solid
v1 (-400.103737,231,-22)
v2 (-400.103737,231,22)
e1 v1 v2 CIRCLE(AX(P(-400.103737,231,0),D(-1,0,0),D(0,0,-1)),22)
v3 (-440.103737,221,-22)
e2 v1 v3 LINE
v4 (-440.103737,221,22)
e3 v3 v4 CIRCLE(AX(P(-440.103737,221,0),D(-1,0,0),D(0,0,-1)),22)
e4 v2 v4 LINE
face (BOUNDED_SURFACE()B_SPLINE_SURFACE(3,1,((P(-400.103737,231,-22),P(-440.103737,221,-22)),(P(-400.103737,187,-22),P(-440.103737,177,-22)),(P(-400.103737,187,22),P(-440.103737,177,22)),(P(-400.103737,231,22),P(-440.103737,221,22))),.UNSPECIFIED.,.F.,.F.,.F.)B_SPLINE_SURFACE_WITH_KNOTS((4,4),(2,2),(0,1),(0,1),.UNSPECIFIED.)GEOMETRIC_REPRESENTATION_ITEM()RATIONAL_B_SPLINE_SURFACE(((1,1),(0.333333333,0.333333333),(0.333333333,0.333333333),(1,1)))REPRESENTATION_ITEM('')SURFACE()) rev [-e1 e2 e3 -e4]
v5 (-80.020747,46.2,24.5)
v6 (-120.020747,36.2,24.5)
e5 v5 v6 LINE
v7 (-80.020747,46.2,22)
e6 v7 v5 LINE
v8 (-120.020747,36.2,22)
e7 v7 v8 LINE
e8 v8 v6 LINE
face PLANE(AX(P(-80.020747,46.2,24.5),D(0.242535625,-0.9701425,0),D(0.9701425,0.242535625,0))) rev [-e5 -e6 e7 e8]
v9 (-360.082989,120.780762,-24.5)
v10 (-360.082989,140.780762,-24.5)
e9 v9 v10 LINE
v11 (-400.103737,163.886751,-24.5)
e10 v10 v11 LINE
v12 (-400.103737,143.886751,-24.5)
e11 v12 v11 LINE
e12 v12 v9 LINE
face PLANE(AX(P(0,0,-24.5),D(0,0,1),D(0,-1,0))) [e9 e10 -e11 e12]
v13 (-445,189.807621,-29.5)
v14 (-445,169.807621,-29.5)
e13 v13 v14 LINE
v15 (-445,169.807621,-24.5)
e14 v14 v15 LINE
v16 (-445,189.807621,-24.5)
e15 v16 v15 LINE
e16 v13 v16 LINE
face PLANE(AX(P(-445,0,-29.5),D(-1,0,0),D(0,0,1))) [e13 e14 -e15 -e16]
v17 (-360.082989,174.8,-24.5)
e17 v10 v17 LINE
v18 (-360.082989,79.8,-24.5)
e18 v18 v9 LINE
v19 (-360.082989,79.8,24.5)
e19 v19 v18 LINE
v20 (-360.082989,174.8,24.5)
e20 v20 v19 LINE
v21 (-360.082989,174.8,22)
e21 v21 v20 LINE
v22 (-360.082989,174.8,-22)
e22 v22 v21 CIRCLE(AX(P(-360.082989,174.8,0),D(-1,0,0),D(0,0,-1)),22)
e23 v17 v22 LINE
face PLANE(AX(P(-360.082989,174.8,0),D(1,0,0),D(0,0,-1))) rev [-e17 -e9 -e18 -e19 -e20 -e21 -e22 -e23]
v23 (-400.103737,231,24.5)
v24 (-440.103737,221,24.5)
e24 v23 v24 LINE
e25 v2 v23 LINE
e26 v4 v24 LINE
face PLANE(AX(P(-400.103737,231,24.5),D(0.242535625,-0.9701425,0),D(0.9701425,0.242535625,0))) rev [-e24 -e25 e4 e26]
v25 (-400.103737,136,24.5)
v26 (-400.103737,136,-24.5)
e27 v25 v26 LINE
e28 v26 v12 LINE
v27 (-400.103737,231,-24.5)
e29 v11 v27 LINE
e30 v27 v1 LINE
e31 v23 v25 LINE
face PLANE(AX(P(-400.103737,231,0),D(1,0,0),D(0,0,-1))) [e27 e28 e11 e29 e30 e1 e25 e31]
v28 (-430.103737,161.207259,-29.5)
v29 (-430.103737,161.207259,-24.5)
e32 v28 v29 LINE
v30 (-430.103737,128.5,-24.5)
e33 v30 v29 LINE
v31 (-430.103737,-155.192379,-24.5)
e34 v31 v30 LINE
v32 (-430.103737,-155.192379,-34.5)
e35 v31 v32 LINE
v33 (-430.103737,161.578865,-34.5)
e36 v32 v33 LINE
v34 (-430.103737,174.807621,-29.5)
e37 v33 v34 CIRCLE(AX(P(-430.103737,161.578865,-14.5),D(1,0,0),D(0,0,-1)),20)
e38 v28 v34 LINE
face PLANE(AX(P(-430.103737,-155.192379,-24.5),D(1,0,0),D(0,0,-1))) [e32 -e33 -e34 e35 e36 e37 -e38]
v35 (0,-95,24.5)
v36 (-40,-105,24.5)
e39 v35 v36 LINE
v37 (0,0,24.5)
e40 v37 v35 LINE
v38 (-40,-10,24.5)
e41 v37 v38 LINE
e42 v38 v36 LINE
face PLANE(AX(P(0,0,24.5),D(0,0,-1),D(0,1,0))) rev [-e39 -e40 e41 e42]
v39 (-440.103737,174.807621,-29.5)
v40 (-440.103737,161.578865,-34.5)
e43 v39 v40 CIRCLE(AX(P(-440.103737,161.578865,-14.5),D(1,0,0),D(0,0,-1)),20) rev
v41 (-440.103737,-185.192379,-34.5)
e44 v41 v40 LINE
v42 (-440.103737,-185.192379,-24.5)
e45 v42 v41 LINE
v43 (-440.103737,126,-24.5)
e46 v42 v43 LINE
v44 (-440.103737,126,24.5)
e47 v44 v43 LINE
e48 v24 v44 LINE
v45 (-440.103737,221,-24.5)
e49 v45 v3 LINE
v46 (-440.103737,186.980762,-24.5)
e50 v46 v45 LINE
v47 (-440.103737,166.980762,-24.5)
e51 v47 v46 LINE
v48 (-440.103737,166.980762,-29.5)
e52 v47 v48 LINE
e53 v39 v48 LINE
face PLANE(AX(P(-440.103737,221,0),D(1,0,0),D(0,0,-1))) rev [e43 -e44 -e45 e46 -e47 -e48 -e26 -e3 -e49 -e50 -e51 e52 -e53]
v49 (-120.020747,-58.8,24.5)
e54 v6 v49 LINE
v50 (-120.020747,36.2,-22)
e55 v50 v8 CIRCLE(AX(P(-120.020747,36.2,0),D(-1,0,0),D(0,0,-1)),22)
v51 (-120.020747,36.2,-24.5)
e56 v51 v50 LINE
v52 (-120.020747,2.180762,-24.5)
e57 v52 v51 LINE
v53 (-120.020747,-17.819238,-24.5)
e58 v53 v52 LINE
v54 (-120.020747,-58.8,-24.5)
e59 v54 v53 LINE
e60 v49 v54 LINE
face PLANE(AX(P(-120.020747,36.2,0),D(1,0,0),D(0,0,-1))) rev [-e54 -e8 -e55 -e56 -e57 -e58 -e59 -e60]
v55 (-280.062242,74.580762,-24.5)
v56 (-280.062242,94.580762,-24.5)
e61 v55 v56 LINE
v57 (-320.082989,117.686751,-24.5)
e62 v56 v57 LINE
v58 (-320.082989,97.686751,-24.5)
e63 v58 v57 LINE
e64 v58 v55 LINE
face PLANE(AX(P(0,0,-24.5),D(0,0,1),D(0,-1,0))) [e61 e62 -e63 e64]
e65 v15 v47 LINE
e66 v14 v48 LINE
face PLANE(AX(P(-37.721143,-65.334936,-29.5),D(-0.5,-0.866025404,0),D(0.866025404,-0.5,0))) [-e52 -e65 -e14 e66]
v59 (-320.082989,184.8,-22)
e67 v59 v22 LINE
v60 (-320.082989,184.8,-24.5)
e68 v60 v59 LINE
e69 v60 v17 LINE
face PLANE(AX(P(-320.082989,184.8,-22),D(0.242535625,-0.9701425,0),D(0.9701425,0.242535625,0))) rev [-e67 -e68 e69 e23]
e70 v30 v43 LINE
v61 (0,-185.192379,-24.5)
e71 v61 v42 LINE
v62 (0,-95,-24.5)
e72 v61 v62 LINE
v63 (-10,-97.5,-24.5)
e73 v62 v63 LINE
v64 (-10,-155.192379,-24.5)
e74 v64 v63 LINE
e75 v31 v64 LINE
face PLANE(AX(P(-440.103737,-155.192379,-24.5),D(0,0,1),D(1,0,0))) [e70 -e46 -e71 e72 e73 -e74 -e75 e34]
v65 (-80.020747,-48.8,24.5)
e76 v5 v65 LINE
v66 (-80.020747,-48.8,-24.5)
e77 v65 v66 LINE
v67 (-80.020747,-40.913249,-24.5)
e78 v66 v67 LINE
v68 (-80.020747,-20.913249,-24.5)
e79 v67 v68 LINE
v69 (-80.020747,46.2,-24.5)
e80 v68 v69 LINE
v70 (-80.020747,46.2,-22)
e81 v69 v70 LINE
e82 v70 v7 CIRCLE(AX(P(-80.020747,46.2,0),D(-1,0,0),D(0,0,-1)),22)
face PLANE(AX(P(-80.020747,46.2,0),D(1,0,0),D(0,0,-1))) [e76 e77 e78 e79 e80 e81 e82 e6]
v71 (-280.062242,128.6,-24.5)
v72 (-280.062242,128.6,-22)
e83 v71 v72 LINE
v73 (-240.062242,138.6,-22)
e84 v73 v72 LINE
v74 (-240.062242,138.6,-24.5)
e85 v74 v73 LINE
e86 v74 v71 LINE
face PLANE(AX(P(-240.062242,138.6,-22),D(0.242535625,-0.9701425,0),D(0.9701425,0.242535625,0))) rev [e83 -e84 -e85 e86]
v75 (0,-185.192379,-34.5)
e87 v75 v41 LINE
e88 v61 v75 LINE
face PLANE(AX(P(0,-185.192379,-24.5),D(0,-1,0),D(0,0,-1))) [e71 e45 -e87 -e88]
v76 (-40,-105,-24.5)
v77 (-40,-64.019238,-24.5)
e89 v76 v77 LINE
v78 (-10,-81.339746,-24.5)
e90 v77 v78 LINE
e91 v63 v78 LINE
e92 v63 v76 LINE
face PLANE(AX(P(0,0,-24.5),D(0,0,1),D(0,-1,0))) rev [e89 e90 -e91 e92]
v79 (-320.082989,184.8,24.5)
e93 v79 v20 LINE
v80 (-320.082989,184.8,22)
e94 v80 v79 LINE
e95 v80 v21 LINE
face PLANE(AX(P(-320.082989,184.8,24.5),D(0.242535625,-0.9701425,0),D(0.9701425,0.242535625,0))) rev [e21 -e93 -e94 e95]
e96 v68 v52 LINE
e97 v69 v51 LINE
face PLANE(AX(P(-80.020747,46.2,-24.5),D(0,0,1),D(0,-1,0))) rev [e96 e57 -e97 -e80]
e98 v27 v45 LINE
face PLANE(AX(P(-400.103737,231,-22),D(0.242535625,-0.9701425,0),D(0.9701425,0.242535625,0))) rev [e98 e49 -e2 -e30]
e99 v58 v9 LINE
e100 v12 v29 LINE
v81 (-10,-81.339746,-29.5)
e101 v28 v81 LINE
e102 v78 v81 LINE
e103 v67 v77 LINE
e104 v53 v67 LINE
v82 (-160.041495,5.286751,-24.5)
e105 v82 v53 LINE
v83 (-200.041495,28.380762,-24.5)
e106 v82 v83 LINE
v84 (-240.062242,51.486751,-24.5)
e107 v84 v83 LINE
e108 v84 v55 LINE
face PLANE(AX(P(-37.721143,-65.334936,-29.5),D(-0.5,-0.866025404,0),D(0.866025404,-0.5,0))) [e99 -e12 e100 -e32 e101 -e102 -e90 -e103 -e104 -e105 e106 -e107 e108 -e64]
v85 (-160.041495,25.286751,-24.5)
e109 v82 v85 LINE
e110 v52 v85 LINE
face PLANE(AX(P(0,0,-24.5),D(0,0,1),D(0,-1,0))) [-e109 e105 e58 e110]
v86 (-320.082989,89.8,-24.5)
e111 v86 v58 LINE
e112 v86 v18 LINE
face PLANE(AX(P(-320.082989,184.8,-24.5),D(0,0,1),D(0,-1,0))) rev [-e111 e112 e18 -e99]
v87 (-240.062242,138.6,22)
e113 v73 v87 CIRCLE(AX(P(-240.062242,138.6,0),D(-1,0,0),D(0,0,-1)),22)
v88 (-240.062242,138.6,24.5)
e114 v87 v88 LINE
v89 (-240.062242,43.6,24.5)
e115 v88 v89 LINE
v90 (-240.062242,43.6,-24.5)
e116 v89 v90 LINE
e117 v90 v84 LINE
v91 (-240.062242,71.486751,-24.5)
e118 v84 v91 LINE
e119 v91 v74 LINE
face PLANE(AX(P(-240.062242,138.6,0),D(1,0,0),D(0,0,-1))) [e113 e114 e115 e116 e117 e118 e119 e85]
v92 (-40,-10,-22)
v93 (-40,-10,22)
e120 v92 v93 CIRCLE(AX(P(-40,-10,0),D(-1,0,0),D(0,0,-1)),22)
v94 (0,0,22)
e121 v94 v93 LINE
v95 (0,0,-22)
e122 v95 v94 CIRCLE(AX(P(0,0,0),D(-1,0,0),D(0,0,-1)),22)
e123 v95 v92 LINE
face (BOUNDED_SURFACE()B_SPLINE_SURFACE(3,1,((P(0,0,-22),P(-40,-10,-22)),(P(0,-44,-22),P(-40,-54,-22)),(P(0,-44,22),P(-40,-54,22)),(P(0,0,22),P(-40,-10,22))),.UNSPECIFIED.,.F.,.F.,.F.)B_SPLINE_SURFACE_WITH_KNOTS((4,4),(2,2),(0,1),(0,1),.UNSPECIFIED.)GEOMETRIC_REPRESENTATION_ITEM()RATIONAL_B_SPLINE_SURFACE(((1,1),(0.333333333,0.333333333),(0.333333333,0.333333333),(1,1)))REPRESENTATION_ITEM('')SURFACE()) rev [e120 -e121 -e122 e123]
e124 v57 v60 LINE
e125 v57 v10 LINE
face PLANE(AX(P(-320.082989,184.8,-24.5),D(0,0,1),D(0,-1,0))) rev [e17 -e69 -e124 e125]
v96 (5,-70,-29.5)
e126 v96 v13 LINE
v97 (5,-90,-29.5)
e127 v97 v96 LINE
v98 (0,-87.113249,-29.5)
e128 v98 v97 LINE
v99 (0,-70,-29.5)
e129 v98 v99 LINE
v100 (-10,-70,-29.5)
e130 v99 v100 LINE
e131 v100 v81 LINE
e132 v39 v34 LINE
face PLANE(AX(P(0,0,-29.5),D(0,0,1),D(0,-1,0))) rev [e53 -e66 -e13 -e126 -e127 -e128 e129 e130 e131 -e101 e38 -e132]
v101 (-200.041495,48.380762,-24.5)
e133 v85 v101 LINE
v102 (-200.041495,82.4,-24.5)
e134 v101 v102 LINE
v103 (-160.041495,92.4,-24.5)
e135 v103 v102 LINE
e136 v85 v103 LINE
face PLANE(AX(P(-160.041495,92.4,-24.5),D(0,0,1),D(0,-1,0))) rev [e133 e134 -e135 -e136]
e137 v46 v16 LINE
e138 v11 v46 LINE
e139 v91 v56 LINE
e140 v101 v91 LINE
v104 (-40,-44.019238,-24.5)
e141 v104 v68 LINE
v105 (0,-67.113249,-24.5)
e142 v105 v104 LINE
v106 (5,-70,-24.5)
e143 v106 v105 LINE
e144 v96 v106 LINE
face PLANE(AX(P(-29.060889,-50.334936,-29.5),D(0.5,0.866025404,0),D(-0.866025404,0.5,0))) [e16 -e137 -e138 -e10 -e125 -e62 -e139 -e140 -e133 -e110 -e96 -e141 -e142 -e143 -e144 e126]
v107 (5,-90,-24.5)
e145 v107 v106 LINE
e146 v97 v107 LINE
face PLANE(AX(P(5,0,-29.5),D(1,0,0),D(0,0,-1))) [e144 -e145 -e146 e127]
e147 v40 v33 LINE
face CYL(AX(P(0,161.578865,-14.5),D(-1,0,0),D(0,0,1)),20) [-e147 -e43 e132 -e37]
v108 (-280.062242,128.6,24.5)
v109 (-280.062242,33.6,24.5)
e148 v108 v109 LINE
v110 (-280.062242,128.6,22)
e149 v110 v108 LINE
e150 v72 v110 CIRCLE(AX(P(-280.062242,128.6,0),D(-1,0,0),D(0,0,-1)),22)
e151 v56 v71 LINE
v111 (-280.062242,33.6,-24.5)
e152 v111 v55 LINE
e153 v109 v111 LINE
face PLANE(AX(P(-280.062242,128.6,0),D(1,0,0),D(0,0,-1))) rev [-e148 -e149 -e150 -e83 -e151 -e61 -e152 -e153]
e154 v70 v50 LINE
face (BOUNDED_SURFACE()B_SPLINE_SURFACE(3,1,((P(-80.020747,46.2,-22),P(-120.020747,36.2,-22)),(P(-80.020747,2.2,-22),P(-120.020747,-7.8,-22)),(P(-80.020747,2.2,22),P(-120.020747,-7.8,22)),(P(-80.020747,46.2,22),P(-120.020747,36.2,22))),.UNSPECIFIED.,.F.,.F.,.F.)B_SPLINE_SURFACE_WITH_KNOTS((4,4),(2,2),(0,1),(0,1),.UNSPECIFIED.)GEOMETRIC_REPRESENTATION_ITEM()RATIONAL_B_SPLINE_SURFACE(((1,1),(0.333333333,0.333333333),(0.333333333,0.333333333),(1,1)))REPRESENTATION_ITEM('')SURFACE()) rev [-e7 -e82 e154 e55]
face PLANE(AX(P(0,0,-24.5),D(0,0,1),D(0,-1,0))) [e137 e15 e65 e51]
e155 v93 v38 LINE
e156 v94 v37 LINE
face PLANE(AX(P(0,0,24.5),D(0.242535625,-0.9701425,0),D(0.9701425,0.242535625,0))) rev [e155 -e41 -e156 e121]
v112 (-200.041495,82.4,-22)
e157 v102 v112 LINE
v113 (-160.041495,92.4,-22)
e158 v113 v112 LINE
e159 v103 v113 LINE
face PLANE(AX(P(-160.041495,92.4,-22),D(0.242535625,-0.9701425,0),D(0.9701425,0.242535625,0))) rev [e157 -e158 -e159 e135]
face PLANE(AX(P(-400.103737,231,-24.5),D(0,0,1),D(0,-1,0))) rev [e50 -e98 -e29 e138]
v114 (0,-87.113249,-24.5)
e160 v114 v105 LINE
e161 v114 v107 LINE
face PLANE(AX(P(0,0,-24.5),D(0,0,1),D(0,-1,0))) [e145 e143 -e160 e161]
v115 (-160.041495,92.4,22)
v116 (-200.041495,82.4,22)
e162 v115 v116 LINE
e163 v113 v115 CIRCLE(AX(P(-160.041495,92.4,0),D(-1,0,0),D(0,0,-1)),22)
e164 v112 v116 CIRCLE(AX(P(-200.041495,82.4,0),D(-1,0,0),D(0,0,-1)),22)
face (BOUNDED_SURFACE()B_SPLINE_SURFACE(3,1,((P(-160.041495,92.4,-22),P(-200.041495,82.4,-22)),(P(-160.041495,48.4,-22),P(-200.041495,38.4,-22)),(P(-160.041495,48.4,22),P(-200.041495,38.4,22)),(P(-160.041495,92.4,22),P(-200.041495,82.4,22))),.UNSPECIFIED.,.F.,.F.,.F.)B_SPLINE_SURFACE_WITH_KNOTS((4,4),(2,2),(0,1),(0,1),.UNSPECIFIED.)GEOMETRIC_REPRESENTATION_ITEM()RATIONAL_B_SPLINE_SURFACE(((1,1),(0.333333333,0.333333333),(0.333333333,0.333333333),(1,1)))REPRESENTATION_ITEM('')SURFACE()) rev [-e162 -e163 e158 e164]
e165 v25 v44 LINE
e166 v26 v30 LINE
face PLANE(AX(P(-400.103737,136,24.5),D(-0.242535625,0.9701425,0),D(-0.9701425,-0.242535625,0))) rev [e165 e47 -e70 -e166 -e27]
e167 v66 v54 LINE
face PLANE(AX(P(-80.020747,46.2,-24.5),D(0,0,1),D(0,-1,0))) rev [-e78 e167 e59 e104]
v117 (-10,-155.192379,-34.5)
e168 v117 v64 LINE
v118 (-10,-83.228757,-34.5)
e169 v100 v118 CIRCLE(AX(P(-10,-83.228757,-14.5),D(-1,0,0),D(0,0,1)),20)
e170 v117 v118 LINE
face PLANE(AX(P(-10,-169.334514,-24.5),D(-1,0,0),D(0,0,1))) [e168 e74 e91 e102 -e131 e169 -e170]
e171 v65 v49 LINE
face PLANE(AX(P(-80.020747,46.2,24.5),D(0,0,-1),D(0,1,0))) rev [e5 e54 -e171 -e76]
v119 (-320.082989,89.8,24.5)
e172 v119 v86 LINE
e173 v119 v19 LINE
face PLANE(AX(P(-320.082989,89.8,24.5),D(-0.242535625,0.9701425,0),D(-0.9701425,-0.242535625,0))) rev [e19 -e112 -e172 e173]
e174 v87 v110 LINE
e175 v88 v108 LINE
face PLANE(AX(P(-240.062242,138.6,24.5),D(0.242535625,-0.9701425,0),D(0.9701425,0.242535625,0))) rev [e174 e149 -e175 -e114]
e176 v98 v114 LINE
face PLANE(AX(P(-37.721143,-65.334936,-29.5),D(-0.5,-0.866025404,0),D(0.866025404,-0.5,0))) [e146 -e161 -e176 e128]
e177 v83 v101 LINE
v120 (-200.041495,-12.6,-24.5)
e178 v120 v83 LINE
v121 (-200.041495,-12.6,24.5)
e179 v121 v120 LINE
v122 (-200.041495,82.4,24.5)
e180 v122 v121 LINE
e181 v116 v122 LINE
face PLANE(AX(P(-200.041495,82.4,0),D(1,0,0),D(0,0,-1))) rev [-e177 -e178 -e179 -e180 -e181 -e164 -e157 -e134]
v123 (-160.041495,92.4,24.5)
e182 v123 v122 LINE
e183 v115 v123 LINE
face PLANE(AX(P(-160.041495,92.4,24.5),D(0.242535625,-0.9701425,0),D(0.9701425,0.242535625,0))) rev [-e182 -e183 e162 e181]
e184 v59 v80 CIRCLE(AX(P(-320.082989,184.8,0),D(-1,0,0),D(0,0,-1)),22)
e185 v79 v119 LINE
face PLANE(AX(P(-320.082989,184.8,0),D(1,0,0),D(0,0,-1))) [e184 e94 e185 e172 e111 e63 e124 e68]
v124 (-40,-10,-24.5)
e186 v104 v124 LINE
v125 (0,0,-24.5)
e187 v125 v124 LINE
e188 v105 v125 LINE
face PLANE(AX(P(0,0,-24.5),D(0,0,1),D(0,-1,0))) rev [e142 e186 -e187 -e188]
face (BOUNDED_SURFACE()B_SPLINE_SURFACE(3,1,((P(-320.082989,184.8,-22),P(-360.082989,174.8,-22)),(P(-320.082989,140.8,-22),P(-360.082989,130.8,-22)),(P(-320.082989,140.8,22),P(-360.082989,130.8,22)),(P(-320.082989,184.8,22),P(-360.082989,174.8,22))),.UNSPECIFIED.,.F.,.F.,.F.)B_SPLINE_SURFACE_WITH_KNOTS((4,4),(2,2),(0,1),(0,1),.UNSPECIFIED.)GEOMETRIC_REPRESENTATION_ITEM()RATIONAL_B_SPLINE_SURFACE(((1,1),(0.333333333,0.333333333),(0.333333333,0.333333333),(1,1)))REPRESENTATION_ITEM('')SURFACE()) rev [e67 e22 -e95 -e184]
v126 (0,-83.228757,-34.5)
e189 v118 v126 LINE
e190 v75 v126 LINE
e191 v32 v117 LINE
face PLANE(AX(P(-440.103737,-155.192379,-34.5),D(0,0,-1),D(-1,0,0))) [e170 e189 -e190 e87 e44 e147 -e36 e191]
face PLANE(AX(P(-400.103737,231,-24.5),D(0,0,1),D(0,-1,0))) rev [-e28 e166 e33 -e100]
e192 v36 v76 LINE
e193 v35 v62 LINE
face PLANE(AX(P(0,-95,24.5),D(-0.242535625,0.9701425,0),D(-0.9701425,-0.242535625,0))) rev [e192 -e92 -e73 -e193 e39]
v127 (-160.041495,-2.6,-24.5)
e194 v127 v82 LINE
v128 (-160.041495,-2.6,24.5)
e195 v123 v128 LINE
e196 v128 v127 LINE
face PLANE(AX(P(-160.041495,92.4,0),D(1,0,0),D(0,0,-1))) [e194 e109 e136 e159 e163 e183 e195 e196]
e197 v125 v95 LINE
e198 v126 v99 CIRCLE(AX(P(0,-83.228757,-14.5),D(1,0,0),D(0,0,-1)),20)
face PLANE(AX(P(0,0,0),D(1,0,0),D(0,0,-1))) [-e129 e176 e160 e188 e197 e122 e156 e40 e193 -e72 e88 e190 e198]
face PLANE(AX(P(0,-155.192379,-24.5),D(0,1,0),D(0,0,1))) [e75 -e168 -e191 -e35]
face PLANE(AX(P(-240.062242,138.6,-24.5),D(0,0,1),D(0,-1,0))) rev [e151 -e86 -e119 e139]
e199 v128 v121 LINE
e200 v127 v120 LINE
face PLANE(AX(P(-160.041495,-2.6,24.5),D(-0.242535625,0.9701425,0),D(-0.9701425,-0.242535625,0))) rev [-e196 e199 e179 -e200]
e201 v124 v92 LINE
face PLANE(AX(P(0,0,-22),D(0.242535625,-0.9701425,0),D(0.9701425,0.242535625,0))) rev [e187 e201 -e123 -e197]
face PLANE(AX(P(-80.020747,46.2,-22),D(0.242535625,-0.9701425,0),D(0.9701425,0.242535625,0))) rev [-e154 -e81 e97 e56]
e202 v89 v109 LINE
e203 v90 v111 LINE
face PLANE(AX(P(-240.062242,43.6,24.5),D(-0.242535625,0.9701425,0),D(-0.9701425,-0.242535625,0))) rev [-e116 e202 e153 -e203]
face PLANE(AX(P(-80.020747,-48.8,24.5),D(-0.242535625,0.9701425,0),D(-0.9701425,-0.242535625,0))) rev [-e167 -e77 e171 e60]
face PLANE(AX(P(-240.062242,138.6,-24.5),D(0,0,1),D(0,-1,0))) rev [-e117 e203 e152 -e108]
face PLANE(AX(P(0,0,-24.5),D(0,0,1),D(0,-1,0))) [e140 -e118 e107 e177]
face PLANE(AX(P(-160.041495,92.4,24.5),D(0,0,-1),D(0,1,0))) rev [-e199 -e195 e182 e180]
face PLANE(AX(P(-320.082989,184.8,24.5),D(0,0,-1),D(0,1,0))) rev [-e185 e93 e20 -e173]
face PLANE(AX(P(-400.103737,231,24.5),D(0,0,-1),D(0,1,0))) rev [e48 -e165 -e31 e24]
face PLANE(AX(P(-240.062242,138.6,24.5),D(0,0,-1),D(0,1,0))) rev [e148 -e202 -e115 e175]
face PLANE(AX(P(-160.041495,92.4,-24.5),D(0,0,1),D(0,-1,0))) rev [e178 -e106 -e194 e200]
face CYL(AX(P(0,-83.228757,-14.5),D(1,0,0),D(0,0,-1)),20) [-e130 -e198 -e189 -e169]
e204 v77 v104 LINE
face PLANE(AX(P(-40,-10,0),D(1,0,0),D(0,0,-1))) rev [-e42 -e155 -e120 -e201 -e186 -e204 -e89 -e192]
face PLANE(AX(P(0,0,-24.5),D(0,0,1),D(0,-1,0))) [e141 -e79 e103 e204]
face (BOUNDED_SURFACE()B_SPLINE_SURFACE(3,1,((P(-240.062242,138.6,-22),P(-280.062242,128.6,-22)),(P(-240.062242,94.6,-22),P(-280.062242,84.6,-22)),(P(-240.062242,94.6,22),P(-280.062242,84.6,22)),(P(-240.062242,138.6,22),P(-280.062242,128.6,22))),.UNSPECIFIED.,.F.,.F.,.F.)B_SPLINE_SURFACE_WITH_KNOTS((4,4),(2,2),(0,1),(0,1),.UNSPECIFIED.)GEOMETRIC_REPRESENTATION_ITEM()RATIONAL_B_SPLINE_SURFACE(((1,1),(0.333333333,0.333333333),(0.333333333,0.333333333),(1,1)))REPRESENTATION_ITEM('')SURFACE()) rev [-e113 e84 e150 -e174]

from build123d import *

# Parameters (mm, degrees)
BOSS_EXTRUDE1_START = -49
BOSS_EXTRUDE1_DEPTH = 5
LPATTERN1_COUNT     = 6
LPATTERN1_PITCH     = 92.4
BOSS_EXTRUDE2_START = -15
SKETCH8_W           = 10
SKETCH8_H           = 10
BOSS_EXTRUDE2_DEPTH = 330
BOSS_EXTRUDE5_REACH = 540.346
SKETCH11_W          = 10
SKETCH11_H          = 10
FILLET1_R           = 20
SKETCH12_W          = 440.103736548
SKETCH12_H          = 30
BOSS_EXTRUDE6_DEPTH = 10


with BuildPart() as part:
    # Sweep1: sweep along a path in Sketch3
    with BuildLine(Plane.XY) as sweep1_path:
        Line((0, 0), (-40, -10))
    # Sketch2 → Sweep1 (sweep)
    with BuildSketch(Plane(origin=(0, 0, 0), x_dir=(0, 0, -1), z_dir=(1, 0, 0))):
        with BuildLine():
            Line((-24.5, 0), (-22, 0))
            ThreePointArc((-22, 0), (0, -22), (22, 0))
            Line((22, 0), (24.5, 0))
            Line((24.5, 0), (24.5, -95))
            Line((24.5, -95), (-24.5, -95))
            Line((-24.5, -95), (-24.5, 0))
        make_face()
    sweep1 = sweep(path=sweep1_path.line)

    # Sketch7 → Boss-Extrude1 (add)
    with BuildSketch(Plane.XY.offset(24.5).offset(BOSS_EXTRUDE1_START)):
        Polygon((5, -70), (-445, 189.807621135), (-445, 169.807621135), (5, -90), align=None)
    extrude(amount=-BOSS_EXTRUDE1_DEPTH)

    # LPattern1: Sweep1 ×6
    with Locations(*[Vector(-0.86602540378444, 0.4999999999999978, 0) * (i * LPATTERN1_PITCH) for i in range(1, LPATTERN1_COUNT)]):
        add(sweep1)

    # Sketch8 → Boss-Extrude2 (add)
    with BuildSketch(Plane(origin=(0, 189.807621135, 0), x_dir=(1, 0, 0), z_dir=(0, 1, 0)).offset(BOSS_EXTRUDE2_START)):
        with Locations((-435.103736548, 29.5)):
            Rectangle(SKETCH8_W, SKETCH8_H)
    extrude(amount=-BOSS_EXTRUDE2_DEPTH)

    # Boss-Extrude5: up to this face of the body (flat: up to its plane)
    boss_extrude5_end = Plane(part.part.faces().sort_by_distance((-435.103736548, -155.192378865, -29.5))[0])
    # Sketch11 → Boss-Extrude5 (add, up to the picked face)
    with BuildSketch(Plane(origin=(0, -70, 0), x_dir=(1, 0, 0), z_dir=(0, 1, 0)), mode=Mode.PRIVATE) as boss_extrude5_sk1:
        with Locations((-5, 29.5)):
            Rectangle(SKETCH11_W, SKETCH11_H)
    boss_extrude5_tool1 = split(extrude(boss_extrude5_sk1.sketch, amount=-BOSS_EXTRUDE5_REACH, mode=Mode.PRIVATE), bisect_by=boss_extrude5_end, keep=Keep.BOTH, mode=Mode.PRIVATE)
    add(boss_extrude5_tool1.solids().sort_by(Axis((-5, -70, -29.5), (0, -1, 0)))[0])

    # Fillet1
    # the kernel refuses this fillet: 20 mm, written as the material it takes off along each edge
    with BuildSketch(Plane(origin=(-43.071891388, -70, -34.5), x_dir=(0, -1, 0), z_dir=(1, 0, 0))) as fillet1_piece_1:
        with BuildLine():
            CenterArc((13.228756555, -20), FILLET1_R, 90, 41.409622109)
            Line((0, -5), (-0.264575131, -4.7))
            ThreePointArc((-0.264575131, -4.7), (-0.4, -2.5), (-0.4, 0))
            Line((-0.4, 0), (0, 0.4))
            Line((0, 0.4), (13.228756555, 0.4))
            Line((13.228756555, 0.4), (13.228756555, 0))
        make_face()
    extrude(amount=76.143782777, mode=Mode.SUBTRACT)
    with BuildSketch(Plane(origin=(-397.03184516, 174.807621135, -34.5), x_dir=(0, -1, 0), z_dir=(-1, 0, 0))) as fillet1_piece_2:
        with BuildLine():
            CenterArc((13.228756555, 20), FILLET1_R, 228.590377891, 41.409622109)
            Line((0, 5), (-0.264575131, 4.7))
            ThreePointArc((-0.264575131, 4.7), (-0.4, 2.5), (-0.4, 0))
            Line((-0.4, 0), (0, -0.4))
            Line((0, -0.4), (13.228756555, -0.4))
            Line((13.228756555, -0.4), (13.228756555, 0))
        make_face()
    extrude(amount=76.143782777, mode=Mode.SUBTRACT)

    # Sketch12 → Boss-Extrude6 (add)
    with BuildSketch(Plane(origin=(0, 0, -34.5), x_dir=(-1, 0, 0), z_dir=(0, 0, -1))):
        with Locations((220.051868274, -170.192378865)):
            Rectangle(SKETCH12_W, SKETCH12_H)
    extrude(amount=-BOSS_EXTRUDE6_DEPTH)


solid = part.part
